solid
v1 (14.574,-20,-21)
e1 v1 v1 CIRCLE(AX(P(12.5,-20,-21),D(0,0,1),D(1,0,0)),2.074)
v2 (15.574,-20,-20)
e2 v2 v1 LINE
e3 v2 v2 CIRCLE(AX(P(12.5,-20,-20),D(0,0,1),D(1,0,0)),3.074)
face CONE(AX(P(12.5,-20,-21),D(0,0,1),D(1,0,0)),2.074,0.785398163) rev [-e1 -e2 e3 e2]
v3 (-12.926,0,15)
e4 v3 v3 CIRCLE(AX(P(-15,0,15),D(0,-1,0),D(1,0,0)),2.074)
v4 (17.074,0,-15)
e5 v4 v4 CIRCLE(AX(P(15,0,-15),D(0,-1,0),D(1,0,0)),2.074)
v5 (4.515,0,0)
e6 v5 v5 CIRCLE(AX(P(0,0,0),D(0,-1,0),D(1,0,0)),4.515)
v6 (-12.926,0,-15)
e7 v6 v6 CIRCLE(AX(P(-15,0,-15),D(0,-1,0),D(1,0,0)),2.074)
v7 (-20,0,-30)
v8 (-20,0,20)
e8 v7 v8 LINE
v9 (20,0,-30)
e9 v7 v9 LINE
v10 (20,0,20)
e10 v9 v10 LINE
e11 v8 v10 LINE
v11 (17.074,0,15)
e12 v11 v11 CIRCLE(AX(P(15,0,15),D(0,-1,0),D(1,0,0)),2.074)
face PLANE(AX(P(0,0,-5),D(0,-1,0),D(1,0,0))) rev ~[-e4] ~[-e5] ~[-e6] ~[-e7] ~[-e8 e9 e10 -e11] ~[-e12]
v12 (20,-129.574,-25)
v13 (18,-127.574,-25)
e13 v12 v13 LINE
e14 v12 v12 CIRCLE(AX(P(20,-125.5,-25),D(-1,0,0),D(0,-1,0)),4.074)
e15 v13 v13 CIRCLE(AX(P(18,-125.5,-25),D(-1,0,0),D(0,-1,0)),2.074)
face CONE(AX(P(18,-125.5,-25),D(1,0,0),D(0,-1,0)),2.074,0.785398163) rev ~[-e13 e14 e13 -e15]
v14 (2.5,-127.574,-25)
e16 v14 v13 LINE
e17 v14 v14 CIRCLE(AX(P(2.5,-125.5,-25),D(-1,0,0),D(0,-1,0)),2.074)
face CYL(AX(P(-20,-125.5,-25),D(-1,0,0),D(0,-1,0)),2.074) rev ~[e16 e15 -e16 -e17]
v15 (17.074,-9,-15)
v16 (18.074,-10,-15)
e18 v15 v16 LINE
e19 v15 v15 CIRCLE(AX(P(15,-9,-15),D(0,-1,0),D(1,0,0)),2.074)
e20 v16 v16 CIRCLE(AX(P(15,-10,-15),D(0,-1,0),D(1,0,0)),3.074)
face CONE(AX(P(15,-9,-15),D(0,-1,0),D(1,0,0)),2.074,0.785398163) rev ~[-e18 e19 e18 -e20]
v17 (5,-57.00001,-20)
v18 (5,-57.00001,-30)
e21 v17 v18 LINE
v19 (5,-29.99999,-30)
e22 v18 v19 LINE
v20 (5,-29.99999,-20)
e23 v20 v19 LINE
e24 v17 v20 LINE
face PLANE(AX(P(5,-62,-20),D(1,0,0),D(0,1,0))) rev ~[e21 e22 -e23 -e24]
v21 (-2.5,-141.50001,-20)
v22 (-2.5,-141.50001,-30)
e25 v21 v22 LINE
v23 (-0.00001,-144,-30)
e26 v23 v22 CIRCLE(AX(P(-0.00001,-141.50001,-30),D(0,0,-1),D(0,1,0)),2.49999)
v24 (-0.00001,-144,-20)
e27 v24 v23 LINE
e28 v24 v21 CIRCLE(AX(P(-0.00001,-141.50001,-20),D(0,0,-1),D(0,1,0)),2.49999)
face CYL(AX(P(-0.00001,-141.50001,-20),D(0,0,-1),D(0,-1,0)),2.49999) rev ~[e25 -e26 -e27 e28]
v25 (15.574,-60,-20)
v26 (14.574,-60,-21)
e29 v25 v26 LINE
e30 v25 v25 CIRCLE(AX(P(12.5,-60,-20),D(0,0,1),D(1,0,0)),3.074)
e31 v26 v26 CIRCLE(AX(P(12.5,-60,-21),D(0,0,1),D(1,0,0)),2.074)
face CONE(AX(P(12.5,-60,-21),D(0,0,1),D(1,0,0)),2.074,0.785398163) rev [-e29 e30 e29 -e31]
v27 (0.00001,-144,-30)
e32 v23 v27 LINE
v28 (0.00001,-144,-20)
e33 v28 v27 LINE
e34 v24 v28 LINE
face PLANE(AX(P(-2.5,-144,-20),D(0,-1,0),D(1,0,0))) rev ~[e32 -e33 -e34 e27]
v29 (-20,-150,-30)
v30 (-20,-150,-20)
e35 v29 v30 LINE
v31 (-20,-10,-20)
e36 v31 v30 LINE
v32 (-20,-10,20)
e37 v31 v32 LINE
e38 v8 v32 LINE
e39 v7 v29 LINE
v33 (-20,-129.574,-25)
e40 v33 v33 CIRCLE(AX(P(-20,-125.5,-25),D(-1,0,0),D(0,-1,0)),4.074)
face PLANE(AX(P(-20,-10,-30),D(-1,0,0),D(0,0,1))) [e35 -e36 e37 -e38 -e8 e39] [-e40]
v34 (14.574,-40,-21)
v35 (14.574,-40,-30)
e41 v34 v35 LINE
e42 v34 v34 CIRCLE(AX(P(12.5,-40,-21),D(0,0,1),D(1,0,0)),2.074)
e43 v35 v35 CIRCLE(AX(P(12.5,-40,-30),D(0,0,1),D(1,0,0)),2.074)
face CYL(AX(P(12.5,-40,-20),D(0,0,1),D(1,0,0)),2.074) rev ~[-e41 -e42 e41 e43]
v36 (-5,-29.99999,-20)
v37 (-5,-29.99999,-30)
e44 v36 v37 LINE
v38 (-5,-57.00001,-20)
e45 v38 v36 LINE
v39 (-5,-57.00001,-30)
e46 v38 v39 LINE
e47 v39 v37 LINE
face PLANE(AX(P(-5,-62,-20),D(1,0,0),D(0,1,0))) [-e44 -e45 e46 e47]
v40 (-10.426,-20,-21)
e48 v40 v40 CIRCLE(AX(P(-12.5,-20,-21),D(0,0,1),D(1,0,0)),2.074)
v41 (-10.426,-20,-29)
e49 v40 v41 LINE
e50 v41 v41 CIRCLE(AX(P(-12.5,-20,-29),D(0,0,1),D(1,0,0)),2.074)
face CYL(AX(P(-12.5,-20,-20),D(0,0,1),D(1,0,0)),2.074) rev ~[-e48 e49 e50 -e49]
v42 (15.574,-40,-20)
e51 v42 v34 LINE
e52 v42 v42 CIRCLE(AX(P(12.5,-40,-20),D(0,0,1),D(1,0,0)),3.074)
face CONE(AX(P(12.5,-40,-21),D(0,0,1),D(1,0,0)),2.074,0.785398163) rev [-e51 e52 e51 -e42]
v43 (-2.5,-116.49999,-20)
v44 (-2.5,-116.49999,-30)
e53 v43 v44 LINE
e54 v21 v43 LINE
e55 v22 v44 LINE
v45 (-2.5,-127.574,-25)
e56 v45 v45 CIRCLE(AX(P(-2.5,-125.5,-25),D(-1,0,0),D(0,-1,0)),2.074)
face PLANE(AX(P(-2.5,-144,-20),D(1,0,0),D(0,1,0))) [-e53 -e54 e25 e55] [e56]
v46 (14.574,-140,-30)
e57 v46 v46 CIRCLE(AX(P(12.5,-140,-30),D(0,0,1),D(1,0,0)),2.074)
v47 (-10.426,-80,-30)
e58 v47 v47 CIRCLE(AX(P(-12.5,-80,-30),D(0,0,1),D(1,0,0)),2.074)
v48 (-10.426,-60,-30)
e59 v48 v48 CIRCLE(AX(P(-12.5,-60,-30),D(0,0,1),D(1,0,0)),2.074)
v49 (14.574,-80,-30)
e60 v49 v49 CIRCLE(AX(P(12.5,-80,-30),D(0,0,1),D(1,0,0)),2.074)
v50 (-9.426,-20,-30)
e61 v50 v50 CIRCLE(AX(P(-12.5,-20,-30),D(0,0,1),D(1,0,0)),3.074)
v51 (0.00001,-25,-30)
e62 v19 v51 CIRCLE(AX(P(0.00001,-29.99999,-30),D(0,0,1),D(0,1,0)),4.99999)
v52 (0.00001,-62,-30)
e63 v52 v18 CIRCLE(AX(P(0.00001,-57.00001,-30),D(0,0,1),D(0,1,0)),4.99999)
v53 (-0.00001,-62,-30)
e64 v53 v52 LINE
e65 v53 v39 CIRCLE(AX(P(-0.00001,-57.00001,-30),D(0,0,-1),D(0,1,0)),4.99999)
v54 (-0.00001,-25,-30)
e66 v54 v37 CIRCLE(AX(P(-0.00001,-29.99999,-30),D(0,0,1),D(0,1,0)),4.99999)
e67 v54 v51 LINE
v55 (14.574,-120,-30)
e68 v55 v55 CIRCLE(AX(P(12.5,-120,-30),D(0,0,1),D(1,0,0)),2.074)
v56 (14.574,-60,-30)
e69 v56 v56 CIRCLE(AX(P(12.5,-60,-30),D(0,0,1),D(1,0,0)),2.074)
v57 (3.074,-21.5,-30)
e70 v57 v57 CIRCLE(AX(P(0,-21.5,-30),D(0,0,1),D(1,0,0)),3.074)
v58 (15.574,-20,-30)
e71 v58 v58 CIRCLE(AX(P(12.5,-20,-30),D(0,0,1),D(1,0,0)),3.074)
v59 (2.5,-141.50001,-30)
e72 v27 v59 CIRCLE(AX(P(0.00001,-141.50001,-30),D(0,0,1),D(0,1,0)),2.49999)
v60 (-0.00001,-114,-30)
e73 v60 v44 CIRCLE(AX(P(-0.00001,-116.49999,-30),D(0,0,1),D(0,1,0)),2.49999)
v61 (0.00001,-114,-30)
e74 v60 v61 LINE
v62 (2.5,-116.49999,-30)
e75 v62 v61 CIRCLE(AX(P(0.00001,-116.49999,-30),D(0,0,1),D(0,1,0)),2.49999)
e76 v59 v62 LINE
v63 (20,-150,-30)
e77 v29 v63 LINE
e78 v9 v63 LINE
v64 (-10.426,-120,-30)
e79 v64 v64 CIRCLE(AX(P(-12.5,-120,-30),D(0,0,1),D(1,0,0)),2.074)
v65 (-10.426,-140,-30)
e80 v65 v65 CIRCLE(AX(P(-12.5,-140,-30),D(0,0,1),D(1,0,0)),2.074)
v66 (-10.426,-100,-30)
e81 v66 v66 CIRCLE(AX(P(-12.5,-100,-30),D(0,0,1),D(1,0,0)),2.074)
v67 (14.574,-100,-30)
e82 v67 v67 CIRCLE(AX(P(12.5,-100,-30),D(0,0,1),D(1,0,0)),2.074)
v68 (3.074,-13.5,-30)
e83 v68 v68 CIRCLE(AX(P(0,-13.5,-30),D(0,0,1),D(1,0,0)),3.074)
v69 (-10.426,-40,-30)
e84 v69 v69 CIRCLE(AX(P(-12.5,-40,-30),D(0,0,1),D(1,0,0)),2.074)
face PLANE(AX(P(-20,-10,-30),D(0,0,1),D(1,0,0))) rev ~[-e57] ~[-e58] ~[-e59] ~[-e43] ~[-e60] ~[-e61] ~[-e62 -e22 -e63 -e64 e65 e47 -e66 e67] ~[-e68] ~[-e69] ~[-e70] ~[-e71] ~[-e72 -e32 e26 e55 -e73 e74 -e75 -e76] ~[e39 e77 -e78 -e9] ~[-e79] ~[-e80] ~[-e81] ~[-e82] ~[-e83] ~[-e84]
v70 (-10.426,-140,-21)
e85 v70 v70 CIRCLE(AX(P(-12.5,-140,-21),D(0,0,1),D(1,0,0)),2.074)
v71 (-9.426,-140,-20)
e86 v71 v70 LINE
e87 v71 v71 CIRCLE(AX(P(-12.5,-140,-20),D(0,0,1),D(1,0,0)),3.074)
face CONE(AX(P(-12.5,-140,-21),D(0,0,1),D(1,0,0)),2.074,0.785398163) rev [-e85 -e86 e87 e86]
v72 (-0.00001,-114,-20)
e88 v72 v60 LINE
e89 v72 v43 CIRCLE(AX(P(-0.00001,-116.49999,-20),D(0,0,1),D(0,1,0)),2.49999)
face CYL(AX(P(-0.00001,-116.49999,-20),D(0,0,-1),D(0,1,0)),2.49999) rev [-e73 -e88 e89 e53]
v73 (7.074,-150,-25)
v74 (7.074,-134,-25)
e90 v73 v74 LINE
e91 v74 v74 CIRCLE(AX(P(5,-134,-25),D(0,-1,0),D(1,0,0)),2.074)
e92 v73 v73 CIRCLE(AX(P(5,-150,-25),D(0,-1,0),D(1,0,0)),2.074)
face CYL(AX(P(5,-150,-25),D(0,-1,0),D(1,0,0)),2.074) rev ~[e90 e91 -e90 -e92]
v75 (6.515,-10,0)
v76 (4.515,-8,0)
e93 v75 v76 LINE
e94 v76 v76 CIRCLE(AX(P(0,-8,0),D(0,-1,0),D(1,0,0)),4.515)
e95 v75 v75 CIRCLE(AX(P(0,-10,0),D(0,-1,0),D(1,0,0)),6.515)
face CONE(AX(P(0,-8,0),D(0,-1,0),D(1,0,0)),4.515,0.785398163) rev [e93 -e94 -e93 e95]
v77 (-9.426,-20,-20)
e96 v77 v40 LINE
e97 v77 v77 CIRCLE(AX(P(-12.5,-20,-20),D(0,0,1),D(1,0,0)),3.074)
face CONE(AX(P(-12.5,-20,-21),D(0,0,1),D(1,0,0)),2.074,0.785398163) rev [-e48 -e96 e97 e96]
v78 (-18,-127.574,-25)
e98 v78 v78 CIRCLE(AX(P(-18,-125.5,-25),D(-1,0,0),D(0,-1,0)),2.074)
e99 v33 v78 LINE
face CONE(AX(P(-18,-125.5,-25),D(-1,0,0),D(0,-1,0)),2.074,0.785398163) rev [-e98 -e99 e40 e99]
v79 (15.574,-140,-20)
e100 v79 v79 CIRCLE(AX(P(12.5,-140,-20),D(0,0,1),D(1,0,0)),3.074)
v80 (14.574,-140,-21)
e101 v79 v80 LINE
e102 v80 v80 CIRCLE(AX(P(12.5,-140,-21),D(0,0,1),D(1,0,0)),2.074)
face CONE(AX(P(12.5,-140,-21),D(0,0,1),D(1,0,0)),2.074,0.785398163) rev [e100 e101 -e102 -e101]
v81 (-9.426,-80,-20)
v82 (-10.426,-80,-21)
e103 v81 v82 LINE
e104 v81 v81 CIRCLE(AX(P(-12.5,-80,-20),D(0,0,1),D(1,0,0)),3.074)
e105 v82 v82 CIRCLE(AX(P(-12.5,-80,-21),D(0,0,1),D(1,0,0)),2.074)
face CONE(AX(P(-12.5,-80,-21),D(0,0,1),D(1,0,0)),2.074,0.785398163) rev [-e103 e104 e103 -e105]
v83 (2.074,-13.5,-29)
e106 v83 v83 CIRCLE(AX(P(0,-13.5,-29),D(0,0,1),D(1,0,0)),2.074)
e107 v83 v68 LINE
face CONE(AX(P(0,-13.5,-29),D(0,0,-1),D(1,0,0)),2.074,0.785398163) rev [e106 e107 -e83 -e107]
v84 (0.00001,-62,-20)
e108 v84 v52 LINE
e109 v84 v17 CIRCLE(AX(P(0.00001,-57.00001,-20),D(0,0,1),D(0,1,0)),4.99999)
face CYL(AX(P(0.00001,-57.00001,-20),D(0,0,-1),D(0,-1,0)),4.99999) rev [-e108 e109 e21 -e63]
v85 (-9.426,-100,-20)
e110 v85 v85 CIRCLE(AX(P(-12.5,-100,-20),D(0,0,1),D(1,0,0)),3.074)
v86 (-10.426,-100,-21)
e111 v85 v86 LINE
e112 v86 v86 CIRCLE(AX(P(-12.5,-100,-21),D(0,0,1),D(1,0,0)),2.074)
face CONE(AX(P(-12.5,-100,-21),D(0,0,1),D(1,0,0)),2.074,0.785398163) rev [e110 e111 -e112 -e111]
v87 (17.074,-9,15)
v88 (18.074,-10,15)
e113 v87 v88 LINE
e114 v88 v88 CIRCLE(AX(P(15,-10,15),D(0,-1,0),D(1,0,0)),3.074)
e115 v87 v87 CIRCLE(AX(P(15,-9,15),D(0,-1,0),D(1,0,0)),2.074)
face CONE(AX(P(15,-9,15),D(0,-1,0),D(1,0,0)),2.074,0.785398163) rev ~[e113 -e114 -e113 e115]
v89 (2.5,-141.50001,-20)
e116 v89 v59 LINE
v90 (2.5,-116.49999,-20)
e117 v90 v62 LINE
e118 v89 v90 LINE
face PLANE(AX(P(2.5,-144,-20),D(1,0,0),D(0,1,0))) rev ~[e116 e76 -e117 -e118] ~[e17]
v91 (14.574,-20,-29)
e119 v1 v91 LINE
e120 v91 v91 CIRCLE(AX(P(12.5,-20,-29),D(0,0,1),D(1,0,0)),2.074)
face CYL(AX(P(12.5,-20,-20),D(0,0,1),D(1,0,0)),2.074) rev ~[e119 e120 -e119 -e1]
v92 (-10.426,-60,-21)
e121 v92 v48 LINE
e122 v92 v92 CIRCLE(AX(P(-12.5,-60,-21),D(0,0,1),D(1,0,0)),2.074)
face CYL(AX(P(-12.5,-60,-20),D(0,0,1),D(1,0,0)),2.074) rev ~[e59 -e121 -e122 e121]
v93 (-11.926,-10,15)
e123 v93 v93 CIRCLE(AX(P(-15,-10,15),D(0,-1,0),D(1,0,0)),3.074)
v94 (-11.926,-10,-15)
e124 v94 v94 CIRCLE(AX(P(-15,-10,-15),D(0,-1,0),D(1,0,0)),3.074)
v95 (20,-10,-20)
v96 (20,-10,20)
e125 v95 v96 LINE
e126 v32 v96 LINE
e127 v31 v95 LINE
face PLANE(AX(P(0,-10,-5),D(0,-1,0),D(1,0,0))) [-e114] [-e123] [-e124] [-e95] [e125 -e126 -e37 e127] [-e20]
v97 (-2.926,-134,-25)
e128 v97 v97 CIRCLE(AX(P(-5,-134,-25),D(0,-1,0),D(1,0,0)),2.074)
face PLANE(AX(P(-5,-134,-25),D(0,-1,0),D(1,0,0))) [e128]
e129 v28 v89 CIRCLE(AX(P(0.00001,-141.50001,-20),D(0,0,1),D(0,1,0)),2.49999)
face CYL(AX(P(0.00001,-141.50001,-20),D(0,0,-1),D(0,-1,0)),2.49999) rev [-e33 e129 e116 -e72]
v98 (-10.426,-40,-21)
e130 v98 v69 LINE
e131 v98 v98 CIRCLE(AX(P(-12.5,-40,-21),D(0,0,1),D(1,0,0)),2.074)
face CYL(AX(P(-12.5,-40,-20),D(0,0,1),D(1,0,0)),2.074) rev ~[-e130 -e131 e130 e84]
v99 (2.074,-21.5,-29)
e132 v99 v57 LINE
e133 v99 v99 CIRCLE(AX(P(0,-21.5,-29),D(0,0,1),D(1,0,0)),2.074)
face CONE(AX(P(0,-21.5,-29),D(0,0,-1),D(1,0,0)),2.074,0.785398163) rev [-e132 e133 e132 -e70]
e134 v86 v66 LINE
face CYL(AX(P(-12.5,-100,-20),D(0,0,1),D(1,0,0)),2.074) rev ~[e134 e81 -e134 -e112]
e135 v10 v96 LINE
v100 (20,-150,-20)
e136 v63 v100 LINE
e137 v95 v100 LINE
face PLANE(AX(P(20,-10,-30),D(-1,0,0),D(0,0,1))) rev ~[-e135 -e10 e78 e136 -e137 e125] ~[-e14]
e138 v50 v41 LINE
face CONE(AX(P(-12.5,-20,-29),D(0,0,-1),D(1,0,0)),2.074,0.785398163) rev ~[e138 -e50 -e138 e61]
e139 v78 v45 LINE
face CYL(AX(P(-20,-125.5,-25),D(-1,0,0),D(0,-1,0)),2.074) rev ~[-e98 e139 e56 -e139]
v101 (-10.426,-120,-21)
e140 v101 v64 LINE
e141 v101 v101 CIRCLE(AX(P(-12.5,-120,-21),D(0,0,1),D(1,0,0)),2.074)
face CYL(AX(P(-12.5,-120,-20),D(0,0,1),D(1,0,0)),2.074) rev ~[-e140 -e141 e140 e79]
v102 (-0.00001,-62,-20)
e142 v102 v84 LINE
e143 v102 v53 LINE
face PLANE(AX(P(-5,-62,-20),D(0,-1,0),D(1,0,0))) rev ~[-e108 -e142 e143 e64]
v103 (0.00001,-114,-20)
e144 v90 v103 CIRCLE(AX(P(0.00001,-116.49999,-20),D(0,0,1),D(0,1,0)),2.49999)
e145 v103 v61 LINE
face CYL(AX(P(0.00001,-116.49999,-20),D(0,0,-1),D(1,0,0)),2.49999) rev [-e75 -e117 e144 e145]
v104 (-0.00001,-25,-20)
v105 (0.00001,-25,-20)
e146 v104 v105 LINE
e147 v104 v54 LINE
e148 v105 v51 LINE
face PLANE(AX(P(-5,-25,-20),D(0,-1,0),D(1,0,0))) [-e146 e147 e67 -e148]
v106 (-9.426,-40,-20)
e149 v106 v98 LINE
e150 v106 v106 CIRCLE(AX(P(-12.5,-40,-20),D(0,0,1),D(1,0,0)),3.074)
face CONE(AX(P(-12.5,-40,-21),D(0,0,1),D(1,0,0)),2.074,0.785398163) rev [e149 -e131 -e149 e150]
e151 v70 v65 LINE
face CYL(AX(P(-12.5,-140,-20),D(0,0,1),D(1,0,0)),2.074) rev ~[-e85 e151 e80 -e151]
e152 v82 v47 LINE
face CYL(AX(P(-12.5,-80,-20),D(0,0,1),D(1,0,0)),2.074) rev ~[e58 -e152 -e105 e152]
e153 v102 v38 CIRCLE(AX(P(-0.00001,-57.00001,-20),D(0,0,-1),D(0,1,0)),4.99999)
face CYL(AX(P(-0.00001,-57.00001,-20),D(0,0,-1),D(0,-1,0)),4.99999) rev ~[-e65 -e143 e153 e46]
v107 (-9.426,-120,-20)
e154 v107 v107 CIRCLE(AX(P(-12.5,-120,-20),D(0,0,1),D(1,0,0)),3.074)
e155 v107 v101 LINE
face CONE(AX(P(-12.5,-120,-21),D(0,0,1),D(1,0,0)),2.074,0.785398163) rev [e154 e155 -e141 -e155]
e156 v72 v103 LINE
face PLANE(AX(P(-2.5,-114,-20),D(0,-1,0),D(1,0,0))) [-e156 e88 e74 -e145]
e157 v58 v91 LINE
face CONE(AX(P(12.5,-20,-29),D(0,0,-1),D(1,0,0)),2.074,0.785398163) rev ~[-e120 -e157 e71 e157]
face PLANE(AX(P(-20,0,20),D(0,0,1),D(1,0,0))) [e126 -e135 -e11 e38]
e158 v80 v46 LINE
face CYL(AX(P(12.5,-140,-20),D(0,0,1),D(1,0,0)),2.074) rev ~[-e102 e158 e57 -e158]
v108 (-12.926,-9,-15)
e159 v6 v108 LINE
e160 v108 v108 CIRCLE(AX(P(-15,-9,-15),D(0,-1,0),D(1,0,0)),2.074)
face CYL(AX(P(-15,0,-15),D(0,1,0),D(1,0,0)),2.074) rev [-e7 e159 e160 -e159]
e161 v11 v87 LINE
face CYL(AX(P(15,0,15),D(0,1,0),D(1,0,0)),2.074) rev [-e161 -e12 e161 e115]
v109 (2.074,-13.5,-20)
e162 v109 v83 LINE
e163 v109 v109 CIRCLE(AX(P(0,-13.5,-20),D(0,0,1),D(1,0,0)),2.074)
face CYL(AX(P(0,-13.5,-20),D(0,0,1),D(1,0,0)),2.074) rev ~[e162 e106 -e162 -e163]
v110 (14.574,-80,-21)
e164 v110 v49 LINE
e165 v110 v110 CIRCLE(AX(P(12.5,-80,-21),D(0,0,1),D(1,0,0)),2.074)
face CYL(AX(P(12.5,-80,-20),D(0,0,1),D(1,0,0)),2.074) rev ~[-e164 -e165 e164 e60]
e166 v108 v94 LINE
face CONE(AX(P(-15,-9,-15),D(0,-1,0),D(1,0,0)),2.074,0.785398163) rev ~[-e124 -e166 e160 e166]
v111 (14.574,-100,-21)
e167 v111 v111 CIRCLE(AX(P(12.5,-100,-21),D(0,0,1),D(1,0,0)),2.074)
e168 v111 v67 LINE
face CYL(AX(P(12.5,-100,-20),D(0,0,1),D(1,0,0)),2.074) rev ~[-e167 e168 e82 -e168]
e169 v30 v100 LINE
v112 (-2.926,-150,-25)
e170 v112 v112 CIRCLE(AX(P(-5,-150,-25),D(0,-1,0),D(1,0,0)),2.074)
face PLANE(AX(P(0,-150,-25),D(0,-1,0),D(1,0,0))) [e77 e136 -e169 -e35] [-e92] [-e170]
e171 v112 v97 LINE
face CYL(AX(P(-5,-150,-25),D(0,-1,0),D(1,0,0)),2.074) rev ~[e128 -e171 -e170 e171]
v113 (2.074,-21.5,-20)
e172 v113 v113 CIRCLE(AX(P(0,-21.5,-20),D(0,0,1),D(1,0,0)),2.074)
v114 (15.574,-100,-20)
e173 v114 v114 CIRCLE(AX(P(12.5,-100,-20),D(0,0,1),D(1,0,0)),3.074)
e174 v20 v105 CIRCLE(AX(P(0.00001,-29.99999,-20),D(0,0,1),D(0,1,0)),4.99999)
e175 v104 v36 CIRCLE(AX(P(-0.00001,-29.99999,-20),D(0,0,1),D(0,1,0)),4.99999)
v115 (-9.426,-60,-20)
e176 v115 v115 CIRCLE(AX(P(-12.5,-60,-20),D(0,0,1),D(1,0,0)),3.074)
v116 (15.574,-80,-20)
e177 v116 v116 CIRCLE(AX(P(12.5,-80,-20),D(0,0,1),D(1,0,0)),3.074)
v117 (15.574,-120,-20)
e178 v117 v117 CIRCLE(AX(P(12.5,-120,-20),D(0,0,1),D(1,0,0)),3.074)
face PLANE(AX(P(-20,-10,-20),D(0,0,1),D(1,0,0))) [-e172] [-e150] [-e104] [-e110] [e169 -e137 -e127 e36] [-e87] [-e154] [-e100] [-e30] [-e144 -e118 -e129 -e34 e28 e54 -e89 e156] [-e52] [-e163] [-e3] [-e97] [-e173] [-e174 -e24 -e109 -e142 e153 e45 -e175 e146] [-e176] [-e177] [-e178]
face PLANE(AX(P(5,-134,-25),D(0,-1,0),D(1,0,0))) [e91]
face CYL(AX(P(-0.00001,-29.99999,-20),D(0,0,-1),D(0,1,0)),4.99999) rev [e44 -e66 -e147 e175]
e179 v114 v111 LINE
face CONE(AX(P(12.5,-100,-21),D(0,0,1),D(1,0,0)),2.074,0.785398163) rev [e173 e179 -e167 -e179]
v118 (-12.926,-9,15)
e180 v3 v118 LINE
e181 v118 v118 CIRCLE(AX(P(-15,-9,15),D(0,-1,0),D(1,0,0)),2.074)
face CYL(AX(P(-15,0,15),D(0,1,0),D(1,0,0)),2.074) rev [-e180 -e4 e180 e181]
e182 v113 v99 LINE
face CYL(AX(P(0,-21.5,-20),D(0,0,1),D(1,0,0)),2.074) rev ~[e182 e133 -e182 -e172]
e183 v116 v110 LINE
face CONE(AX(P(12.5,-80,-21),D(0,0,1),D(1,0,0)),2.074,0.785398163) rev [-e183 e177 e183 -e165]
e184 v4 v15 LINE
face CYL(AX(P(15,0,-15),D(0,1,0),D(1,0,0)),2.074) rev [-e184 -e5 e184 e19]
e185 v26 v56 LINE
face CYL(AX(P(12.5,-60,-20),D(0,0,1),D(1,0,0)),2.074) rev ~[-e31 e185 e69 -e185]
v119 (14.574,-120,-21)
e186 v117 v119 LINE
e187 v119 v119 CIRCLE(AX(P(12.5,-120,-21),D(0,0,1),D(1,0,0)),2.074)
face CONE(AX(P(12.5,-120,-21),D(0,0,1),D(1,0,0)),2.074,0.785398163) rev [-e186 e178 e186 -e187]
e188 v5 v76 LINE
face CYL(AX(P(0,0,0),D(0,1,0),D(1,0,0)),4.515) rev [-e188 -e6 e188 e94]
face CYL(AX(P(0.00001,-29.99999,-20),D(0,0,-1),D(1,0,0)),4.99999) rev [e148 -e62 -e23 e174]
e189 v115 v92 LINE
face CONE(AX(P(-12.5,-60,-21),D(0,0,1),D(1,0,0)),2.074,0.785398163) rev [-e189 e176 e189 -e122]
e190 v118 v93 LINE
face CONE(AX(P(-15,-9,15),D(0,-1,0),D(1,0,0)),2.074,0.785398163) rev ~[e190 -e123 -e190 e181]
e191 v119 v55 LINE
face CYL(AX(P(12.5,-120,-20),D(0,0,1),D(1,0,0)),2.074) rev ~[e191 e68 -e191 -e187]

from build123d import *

# Parameters (mm, degrees)
F0_W      = 40
F0_H      = 50
F0_R      = 2.074
F0_R_2    = 4.515
F1_DEPTH  = 10
F2_W      = 40
F2_H      = 10
F3_DEPTH  = 140
F4_SIZE   = 1
F5_SIZE   = 2
F6_W      = 10
F6_H      = 37
F7_DEPTH  = 10
F8_R      = 4.99999
F9_R      = 2.074
F10_DEPTH = 10
F11_R     = 2.074
F12_DEPTH = 10.001
F13_R     = 2.074
F14_DEPTH = 16
F15_SIZE  = 1
F16_SIZE  = 1
F17_W     = 5
F17_H     = 30
F18_DEPTH = 10.001
F19_R     = 2.49999
F20_R     = 2.074
F21_DEPTH = 40.001
F22_SIZE  = 2


# Not quite as in the source:
# - a fillet or chamfer is up to 0.001 mm smaller than in the source, because OpenCascade refuses the exact size


with BuildPart() as f1:
    # F0 (on Front) → F1 (new body)
    with BuildSketch(Plane.XZ):
        with Locations((0, -5)):
            Rectangle(F0_W, F0_H)
        with Locations((-15, -15)):
            Circle(F0_R, mode=Mode.SUBTRACT)
        with Locations((15, -15)):
            Circle(F0_R, mode=Mode.SUBTRACT)
        with Locations((-15, 15)):
            Circle(F0_R, mode=Mode.SUBTRACT)
        Circle(F0_R_2, mode=Mode.SUBTRACT)
        with Locations((15, 15)):
            Circle(F0_R, mode=Mode.SUBTRACT)
    extrude(amount=F1_DEPTH)

    # F2 (on face) → F3 (join)
    with BuildSketch(Plane.XZ.offset(10)):
        with Locations((0, -25)):
            Rectangle(F2_W, F2_H)
    extrude(amount=F3_DEPTH)

    # F4
    f4_edges = [f1.edges().sort_by_distance(p)[0] for p in [
        (-17.074, -10, 15),
        (12.926, -10, 15),
        (12.926, -10, -15),
        (-17.074, -10, -15),
    ]]
    chamfer(f4_edges, length=F4_SIZE)

    # F5
    f5_edges = [f1.edges().sort_by_distance(p)[0] for p in [
        (-4.515, -10, 0),
    ]]
    chamfer(f5_edges, length=F5_SIZE)

    # F6 (on face) → F7 (cut, through all)
    with BuildSketch(Plane.XY.offset(-20)):
        with Locations((0, -43.5)):
            Rectangle(F6_W, F6_H)
    extrude(amount=-F7_DEPTH, mode=Mode.SUBTRACT)

    # F8 (radius 5 in the source; OpenCascade refuses exactly that, so slightly less here)
    f8_edges = [f1.edges().sort_by_distance(p)[0] for p in [
        (5, -62, -25),
        (-5, -62, -25),
        (5, -25, -25),
        (-5, -25, -25),
    ]]
    fillet(f8_edges, radius=F8_R)

    # F9 (on face) → F10 (cut, through all)
    with BuildSketch(Plane.XY.offset(-20)):
        with Locations((-12.5, -140)):
            Circle(F9_R)
        with Locations((-12.5, -120)):
            Circle(F9_R)
        with Locations((-12.5, -100)):
            Circle(F9_R)
        with Locations((-12.5, -80)):
            Circle(F9_R)
        with Locations((-12.5, -60)):
            Circle(F9_R)
        with Locations((12.5, -60)):
            Circle(F9_R)
        with Locations((12.5, -80)):
            Circle(F9_R)
        with Locations((12.5, -100)):
            Circle(F9_R)
        with Locations((12.5, -140)):
            Circle(F9_R)
        with Locations((12.5, -120)):
            Circle(F9_R)
        with Locations((-12.5, -40)):
            Circle(F9_R)
        with Locations((-12.5, -20)):
            Circle(F9_R)
        with Locations((12.5, -40)):
            Circle(F9_R)
        with Locations((12.5, -20)):
            Circle(F9_R)
    extrude(amount=-F10_DEPTH, mode=Mode.SUBTRACT)

    # F11 (on face) → F12 (cut, through all)
    with BuildSketch(Plane.XY.offset(-20)):
        with Locations((0, -13.5)):
            Circle(F11_R)
        with Locations((0, -21.5)):
            Circle(F11_R)
    extrude(amount=-F12_DEPTH, mode=Mode.SUBTRACT)

    # F13 (on face) → F14 (cut)
    with BuildSketch(Plane.XZ.offset(150)):
        with Locations((-5, -25)):
            Circle(F13_R)
        with Locations((5, -25)):
            Circle(F13_R)
    extrude(amount=-F14_DEPTH, mode=Mode.SUBTRACT)

    # F15
    f15_edges = [f1.edges().sort_by_distance(p)[0] for p in [
        (-2.074, -21.5, -30),
        (-2.074, -13.5, -30),
    ]]
    chamfer(f15_edges, length=F15_SIZE)

    # F16
    f16_edges = [f1.edges().sort_by_distance(p)[0] for p in [
        (-14.574, -140, -20),
        (10.426, -140, -20),
        (10.426, -120, -20),
        (-14.574, -120, -20),
        (10.426, -100, -20),
        (-14.574, -100, -20),
        (10.426, -80, -20),
        (-14.574, -80, -20),
        (10.426, -60, -20),
        (-14.574, -60, -20),
        (-14.574, -40, -20),
        (10.426, -40, -20),
        (-10.426, -20, -25),
        (-14.574, -20, -20),
        (-14.574, -20, -30),
        (14.574, -20, -25),
        (10.426, -20, -20),
        (10.426, -20, -30),
    ]]
    chamfer(f16_edges, length=F16_SIZE)

    # F17 (on face) → F18 (cut, through all)
    with BuildSketch(Plane.XY.offset(-20)):
        with Locations((0, -129)):
            Rectangle(F17_W, F17_H)
    extrude(amount=-F18_DEPTH, mode=Mode.SUBTRACT)

    # F19 (radius 2.5 in the source; OpenCascade refuses exactly that, so slightly less here)
    f19_edges = [f1.edges().sort_by_distance(p)[0] for p in [
        (-2.5, -144, -25),
        (2.5, -144, -25),
        (-2.5, -114, -25),
        (2.5, -114, -25),
    ]]
    fillet(f19_edges, radius=F19_R)

    # F20 (on face) → F21 (cut, through all)
    with BuildSketch(Plane(origin=(-20, 0, 0), x_dir=(0, -1, 0), z_dir=(-1, 0, 0))):
        with Locations((125.5, -25)):
            Circle(F20_R)
    extrude(amount=-F21_DEPTH, mode=Mode.SUBTRACT)

    # F22
    f22_edges = [f1.edges().sort_by_distance(p)[0] for p in [
        (-20, -123.426, -25),
        (20, -123.426, -25),
    ]]
    chamfer(f22_edges, length=F22_SIZE)


solid = f1.part
